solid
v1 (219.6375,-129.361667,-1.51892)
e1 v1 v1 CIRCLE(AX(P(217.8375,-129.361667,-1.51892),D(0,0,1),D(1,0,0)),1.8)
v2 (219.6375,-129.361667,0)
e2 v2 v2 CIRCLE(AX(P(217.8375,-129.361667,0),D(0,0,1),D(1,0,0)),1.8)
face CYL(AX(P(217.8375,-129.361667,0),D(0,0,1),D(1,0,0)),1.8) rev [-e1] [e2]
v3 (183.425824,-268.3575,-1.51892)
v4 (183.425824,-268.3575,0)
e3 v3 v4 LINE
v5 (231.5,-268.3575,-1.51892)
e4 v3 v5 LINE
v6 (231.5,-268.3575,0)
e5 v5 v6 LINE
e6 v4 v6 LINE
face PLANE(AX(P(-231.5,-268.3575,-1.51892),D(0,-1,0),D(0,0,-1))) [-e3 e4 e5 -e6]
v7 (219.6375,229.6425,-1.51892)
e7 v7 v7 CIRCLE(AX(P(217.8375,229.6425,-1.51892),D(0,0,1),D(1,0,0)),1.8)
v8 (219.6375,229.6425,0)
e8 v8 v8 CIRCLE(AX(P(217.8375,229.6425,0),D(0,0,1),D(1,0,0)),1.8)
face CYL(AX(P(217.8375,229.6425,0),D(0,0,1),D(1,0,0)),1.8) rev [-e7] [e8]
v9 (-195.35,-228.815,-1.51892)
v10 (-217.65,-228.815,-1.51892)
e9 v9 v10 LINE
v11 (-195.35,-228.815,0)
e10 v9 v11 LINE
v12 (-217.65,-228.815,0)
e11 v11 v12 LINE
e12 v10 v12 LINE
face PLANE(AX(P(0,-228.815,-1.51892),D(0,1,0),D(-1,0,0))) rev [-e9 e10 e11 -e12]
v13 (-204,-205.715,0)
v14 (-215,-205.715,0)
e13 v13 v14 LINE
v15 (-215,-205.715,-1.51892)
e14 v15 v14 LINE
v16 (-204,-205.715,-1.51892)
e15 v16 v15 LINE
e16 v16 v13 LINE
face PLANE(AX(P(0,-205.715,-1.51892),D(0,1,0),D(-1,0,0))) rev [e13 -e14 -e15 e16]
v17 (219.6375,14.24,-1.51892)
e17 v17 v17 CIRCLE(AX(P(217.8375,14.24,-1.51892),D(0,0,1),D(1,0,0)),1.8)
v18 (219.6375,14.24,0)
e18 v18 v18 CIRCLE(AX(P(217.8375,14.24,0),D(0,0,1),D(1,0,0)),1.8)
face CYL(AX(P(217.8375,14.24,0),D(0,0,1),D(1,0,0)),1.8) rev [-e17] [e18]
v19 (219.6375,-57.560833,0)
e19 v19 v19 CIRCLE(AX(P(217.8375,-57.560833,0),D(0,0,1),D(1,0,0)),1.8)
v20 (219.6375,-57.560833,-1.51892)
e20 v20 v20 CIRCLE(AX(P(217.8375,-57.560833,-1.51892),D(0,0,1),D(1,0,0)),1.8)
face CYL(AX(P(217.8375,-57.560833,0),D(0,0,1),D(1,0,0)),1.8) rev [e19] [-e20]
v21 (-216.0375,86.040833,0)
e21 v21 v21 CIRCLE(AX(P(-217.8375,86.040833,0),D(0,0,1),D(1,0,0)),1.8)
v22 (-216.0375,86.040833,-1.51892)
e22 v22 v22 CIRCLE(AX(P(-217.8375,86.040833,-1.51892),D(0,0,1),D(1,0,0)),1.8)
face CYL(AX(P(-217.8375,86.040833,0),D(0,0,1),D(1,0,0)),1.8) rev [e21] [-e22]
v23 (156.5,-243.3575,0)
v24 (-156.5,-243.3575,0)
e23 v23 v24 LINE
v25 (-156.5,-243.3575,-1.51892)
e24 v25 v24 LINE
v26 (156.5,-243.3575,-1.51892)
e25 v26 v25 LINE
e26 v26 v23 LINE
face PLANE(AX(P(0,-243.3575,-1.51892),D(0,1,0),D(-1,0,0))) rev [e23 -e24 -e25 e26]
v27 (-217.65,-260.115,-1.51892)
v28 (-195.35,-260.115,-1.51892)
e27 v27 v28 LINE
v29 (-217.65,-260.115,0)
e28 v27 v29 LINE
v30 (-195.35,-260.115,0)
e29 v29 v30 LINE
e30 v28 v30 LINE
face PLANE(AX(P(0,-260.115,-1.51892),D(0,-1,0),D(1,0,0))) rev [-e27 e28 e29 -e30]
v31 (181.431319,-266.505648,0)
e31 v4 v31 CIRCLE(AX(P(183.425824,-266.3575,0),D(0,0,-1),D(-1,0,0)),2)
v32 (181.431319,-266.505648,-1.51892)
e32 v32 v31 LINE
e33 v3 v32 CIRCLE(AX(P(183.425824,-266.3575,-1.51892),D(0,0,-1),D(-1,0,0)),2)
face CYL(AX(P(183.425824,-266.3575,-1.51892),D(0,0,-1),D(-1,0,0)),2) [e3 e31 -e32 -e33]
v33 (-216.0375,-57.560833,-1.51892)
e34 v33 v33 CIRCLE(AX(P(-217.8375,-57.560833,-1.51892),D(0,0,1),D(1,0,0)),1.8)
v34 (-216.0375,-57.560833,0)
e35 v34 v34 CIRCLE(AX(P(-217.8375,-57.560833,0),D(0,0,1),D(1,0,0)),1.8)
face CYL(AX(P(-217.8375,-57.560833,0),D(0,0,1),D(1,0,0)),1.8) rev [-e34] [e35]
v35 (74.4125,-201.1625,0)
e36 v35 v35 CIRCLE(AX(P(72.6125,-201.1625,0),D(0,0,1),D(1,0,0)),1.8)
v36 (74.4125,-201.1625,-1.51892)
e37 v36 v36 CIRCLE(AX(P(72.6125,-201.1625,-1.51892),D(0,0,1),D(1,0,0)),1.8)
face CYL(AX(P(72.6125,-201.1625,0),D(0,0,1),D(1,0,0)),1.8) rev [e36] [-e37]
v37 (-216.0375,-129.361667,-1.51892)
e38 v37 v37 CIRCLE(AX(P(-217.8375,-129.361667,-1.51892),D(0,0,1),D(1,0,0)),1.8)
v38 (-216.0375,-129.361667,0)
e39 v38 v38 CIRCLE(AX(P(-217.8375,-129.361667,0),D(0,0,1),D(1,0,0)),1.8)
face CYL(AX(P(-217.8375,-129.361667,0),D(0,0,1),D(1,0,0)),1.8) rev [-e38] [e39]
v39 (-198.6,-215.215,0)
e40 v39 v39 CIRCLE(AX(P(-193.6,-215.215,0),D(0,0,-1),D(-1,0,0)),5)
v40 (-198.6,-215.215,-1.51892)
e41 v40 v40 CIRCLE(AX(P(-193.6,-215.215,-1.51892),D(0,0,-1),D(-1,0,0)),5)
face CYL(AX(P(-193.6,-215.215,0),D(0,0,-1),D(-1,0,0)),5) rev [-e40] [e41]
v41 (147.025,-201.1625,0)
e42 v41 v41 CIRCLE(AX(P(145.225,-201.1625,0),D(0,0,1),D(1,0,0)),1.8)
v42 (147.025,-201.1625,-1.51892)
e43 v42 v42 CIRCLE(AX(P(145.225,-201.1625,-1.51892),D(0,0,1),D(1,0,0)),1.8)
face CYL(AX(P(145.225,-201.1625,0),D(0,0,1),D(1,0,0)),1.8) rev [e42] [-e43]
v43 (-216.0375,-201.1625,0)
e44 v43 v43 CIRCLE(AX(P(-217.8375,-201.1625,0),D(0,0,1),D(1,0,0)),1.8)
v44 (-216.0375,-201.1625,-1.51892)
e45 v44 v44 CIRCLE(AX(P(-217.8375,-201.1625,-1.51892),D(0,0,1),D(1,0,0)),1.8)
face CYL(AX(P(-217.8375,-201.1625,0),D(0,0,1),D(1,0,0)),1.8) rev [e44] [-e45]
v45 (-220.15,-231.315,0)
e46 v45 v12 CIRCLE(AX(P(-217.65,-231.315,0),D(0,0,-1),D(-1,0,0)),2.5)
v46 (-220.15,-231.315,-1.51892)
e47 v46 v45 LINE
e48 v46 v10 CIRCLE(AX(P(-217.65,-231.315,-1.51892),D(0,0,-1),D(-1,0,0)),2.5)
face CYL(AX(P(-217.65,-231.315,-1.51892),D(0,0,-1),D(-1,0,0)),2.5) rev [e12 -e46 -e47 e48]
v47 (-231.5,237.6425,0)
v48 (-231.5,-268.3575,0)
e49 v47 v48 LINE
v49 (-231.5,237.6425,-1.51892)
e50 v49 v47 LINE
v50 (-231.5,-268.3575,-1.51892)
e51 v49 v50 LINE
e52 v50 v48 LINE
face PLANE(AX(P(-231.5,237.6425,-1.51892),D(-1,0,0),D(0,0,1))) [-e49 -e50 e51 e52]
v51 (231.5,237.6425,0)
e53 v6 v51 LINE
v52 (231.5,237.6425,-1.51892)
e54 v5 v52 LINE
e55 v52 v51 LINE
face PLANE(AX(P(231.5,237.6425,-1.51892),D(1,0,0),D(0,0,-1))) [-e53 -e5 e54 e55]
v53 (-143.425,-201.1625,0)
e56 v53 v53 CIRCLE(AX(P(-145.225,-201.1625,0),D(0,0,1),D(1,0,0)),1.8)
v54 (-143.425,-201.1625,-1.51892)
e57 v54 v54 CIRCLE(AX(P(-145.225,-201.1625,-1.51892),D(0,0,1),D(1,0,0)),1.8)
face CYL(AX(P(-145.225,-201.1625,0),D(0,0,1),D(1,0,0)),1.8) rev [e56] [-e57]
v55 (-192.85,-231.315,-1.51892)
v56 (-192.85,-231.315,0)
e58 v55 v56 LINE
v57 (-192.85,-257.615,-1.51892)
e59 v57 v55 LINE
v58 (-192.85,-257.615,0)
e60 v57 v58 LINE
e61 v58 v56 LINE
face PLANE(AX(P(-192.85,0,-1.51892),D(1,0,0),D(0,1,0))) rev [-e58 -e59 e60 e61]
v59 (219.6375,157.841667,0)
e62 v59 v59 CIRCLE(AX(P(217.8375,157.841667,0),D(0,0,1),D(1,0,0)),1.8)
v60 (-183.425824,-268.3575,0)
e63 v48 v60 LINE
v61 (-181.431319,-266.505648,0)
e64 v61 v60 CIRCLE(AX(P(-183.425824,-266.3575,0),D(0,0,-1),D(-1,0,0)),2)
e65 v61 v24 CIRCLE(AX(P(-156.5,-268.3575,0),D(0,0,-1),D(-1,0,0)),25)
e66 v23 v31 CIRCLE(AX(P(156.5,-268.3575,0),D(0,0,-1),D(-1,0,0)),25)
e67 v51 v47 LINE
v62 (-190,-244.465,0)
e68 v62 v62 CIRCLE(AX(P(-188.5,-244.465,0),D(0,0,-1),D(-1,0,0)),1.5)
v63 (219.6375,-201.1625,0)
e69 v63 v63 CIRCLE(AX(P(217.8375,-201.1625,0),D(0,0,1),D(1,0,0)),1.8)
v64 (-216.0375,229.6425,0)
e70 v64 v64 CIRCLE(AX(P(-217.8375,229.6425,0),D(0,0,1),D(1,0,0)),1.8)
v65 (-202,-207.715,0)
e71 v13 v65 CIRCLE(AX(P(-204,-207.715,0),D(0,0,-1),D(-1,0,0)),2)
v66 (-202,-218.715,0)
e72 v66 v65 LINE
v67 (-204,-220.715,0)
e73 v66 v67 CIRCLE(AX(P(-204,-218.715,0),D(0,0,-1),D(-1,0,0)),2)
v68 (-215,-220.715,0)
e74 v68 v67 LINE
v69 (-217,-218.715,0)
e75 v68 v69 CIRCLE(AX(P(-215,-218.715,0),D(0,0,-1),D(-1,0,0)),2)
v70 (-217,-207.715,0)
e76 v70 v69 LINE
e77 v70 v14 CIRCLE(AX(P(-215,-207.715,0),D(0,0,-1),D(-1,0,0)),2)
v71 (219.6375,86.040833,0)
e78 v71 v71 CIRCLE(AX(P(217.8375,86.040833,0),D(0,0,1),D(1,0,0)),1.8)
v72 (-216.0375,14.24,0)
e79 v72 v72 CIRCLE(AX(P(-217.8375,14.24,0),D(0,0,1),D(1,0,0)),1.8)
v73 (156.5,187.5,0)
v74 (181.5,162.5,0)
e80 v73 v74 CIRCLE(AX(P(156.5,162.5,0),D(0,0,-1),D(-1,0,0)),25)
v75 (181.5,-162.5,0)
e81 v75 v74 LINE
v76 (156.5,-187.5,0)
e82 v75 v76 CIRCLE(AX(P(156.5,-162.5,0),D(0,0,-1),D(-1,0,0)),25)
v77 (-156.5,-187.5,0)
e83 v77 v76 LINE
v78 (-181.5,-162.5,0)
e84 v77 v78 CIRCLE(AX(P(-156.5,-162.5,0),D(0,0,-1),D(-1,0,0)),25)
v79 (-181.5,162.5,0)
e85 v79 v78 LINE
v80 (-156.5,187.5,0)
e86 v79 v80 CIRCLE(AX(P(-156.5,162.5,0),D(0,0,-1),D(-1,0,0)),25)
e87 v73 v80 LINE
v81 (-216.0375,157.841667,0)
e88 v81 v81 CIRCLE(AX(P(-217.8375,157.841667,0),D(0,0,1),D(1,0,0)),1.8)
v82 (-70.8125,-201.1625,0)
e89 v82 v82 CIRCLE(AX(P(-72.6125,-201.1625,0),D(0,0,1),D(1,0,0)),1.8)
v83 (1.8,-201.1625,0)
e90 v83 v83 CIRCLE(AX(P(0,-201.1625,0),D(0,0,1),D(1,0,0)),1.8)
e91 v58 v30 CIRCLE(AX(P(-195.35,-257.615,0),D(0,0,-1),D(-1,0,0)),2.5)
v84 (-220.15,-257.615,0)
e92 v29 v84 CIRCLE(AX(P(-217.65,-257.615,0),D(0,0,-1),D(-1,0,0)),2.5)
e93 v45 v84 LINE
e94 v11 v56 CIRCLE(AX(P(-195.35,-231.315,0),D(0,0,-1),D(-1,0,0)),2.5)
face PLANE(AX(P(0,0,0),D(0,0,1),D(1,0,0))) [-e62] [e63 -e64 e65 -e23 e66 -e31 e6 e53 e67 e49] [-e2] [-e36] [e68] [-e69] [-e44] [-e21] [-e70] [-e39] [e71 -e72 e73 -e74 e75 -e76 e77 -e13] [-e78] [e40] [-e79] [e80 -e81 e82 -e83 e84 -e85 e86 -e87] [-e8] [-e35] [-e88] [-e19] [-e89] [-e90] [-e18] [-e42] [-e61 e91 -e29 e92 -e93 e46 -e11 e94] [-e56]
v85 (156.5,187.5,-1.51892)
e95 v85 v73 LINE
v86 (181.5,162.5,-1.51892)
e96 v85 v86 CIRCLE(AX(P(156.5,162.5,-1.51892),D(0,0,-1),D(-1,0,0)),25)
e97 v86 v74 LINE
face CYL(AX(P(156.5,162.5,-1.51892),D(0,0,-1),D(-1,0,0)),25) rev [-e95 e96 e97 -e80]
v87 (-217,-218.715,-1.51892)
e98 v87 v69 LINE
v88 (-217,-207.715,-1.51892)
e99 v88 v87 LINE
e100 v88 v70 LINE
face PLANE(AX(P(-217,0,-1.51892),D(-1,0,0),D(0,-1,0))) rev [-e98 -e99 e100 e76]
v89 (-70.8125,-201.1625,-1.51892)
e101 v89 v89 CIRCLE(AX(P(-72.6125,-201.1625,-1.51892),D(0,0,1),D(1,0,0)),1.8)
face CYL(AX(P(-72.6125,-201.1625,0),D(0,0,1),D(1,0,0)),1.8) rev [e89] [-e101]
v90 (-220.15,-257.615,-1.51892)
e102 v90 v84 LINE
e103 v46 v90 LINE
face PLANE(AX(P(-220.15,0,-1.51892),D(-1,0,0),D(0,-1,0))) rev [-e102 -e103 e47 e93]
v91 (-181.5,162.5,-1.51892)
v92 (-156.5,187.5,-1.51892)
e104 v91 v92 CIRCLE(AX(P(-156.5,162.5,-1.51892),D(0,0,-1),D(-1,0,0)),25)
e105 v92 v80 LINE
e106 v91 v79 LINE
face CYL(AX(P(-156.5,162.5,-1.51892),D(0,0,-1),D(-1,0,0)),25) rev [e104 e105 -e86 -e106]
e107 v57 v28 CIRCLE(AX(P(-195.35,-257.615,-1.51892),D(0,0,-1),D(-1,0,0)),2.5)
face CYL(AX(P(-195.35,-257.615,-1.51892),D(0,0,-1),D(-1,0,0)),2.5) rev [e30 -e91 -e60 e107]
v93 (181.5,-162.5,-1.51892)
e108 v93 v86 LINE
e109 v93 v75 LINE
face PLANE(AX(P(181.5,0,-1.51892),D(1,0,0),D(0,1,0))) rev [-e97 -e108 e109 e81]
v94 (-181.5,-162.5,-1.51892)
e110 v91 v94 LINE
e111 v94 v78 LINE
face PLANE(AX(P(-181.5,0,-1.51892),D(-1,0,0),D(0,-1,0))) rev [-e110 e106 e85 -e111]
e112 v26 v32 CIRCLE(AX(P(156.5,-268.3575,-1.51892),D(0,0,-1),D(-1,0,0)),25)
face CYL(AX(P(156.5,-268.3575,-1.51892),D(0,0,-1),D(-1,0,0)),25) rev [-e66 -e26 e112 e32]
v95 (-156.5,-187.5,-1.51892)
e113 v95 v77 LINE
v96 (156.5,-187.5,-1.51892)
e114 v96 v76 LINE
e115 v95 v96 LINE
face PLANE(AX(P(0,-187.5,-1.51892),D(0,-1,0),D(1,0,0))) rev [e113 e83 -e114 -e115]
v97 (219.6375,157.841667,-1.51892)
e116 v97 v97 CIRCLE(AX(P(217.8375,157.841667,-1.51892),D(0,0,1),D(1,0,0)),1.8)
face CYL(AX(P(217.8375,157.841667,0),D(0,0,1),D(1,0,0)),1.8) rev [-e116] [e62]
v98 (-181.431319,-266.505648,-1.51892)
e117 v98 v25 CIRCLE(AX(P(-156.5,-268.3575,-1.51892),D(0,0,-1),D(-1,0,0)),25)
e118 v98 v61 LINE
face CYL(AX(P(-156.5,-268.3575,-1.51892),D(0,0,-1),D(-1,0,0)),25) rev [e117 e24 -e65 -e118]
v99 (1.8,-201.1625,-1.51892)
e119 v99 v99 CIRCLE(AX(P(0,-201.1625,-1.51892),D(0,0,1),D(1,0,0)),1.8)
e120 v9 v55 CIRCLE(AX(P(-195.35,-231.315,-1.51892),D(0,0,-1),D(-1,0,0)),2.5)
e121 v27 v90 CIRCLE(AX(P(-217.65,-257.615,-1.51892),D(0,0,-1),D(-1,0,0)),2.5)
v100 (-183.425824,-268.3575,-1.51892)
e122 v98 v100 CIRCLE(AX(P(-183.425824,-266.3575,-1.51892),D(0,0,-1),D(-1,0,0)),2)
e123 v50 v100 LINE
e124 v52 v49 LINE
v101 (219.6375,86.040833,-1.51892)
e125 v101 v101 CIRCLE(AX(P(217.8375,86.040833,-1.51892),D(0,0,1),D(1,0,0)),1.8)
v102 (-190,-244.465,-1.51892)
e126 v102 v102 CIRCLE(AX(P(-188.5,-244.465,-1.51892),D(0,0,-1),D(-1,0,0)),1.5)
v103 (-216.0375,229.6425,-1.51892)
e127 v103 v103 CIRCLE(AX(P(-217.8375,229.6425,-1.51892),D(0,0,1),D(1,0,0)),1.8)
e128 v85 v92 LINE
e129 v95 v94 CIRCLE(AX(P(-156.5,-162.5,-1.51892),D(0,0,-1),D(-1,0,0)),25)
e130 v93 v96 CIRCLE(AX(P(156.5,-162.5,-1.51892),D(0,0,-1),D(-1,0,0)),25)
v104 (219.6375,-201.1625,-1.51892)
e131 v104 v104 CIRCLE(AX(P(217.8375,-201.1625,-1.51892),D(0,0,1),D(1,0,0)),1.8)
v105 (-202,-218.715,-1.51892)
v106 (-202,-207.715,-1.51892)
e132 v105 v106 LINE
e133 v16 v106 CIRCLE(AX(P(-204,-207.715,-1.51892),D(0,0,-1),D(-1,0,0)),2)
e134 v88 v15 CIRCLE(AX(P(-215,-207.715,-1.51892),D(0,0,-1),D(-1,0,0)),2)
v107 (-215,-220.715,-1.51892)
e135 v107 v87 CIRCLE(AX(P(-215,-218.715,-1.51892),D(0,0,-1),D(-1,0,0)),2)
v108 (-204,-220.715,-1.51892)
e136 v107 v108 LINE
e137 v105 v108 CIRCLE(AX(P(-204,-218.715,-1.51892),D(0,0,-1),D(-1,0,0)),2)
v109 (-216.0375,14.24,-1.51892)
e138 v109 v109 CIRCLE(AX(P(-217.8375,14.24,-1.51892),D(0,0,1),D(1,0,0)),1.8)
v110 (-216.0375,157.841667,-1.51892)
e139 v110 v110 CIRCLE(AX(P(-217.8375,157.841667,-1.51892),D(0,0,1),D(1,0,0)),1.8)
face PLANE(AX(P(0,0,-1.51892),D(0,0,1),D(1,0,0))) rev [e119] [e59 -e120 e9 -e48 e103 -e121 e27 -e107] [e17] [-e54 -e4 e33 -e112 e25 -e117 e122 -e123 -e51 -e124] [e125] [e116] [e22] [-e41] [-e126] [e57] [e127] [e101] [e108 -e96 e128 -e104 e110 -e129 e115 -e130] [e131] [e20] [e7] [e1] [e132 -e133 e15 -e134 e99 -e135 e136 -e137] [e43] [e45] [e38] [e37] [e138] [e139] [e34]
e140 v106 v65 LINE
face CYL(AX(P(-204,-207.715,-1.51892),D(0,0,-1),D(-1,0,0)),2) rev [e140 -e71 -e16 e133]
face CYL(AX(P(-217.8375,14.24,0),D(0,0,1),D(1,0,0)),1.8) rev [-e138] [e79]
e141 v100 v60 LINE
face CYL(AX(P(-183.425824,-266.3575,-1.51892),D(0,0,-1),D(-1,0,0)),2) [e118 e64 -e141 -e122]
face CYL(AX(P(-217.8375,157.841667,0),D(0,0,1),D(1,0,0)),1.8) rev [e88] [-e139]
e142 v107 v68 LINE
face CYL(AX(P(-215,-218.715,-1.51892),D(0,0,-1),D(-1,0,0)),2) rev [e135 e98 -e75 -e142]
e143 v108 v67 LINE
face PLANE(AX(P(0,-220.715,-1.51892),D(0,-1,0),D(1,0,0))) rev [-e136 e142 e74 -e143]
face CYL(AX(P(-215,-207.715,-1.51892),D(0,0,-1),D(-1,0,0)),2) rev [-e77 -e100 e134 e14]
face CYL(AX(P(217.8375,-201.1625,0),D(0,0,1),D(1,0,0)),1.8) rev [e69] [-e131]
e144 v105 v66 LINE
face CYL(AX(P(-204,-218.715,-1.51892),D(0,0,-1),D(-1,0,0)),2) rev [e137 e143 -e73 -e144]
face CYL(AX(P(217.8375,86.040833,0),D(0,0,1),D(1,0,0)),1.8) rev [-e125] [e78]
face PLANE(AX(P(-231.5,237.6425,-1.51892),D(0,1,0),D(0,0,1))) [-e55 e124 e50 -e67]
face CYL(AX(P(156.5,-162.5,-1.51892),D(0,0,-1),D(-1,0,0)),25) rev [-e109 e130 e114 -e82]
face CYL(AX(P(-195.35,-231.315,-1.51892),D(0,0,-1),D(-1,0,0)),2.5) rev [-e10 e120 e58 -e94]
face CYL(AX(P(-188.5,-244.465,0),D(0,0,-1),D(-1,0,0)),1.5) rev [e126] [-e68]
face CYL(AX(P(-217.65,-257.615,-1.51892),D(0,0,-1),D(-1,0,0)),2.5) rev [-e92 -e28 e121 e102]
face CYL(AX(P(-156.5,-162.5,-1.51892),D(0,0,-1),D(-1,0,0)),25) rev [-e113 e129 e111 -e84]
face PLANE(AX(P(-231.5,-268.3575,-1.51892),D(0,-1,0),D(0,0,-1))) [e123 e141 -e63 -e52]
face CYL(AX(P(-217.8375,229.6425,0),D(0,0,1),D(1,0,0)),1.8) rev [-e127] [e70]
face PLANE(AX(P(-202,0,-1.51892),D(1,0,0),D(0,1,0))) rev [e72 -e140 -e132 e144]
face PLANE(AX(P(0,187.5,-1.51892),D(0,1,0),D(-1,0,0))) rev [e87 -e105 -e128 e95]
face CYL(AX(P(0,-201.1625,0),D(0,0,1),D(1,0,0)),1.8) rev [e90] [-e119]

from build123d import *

# Parameters (mm, degrees)
SKETCH2_W                = 463
SKETCH2_H                = 506
BASE_FLANGE1_DEPTH       = 1.51892
SKETCH13_R               = 1.5
SKETCH13_R_2             = 5
CUT_EXTRUDE1_DEPTH       = 1.51892
M3_CLEARANCE_HOLE2_D     = 3.6
M3_CLEARANCE_HOLE2_DEPTH = 11.938
M3_CLEARANCE_HOLE2_TIP   = 1.081549114


# Sheet-metal steps are written as plain solids
with BuildPart() as part:
    # Sketch2 → Base-Flange1 (new body)
    with BuildSketch(Plane.XY):
        with Locations((0, -15.3575)):
            Rectangle(SKETCH2_W, SKETCH2_H)
    extrude(amount=-BASE_FLANGE1_DEPTH)

    # Sketch13 → Cut-Extrude1 (cut)
    with BuildSketch(Plane(origin=(0, 0, -1.51892), x_dir=(-1, 0, 0), z_dir=(0, 0, -1))):
        with BuildLine():
            Line((156.5, 187.5), (-156.5, 187.5))
            ThreePointArc((-156.5, 187.5), (-174.17766953, 180.17766953), (-181.5, 162.5))
            Line((-181.5, 162.5), (-181.5, -162.5))
            ThreePointArc((-181.5, -162.5), (-174.17766953, -180.17766953), (-156.5, -187.5))
            Line((-156.5, -187.5), (156.5, -187.5))
            ThreePointArc((156.5, -187.5), (174.17766953, -180.17766953), (181.5, -162.5))
            Line((181.5, -162.5), (181.5, 162.5))
            ThreePointArc((181.5, 162.5), (174.17766953, 180.17766953), (156.5, 187.5))
        make_face()
        with BuildLine():
            Line((217.65, -260.115), (195.35, -260.115))
            ThreePointArc((195.35, -260.115), (193.582233047, -259.382766953), (192.85, -257.615))
            Line((192.85, -257.615), (192.85, -231.315))
            ThreePointArc((192.85, -231.315), (193.582233047, -229.547233047), (195.35, -228.815))
            Line((195.35, -228.815), (217.65, -228.815))
            ThreePointArc((217.65, -228.815), (219.417766953, -229.547233047), (220.15, -231.315))
            Line((220.15, -231.315), (220.15, -257.615))
            ThreePointArc((220.15, -257.615), (219.417766953, -259.382766953), (217.65, -260.115))
        make_face()
        with BuildLine():
            Line((156.5, -243.3575), (-156.5, -243.3575))
            ThreePointArc((-156.5, -243.3575), (-173.510345436, -250.03679728), (-181.431318552, -266.505648148))
            ThreePointArc((-181.431318552, -266.505648148), (-182.064996401, -267.823156218), (-183.425824036, -268.3575))
            Line((-183.425824036, -268.3575), (183.425824036, -268.3575))
            ThreePointArc((183.425824036, -268.3575), (182.064996401, -267.823156218), (181.431318552, -266.505648148))
            ThreePointArc((181.431318552, -266.505648148), (173.510345436, -250.03679728), (156.5, -243.3575))
        make_face()
        with Locations((188.5, -244.465)):
            Circle(SKETCH13_R)
        with BuildLine():
            Line((217, -207.715), (217, -218.715))
            ThreePointArc((217, -218.715), (216.414213562, -220.129213562), (215, -220.715))
            Line((215, -220.715), (204, -220.715))
            ThreePointArc((204, -220.715), (202.585786438, -220.129213562), (202, -218.715))
            Line((202, -218.715), (202, -207.715))
            ThreePointArc((202, -207.715), (202.585786438, -206.300786438), (204, -205.715))
            Line((204, -205.715), (215, -205.715))
            ThreePointArc((215, -205.715), (216.414213562, -206.300786438), (217, -207.715))
        make_face()
        with Locations((193.6, -215.215)):
            Circle(SKETCH13_R_2)
    extrude(amount=-CUT_EXTRUDE1_DEPTH, mode=Mode.SUBTRACT)

    # M3 Clearance Hole2
    with Locations(Plane.XY):
        with Locations((217.8375, -129.361666667), (217.8375, -57.560833333), (217.8375, 14.24), (217.8375, 86.040833333), (217.8375, 157.841666667), (-217.8375, 157.841666667), (-217.8375, 86.040833333), (-217.8375, 14.24), (-217.8375, -57.560833333), (-217.8375, -129.361666667), (-145.225, -201.1625), (-72.6125, -201.1625), (0, -201.1625), (72.6125, -201.1625), (145.225, -201.1625), (-217.8375, 229.6425), (217.8375, 229.6425), (217.8375, -201.1625), (-217.8375, -201.1625)):
            Hole(M3_CLEARANCE_HOLE2_D / 2, depth=M3_CLEARANCE_HOLE2_DEPTH)
            with Locations((0, 0, -(M3_CLEARANCE_HOLE2_DEPTH + M3_CLEARANCE_HOLE2_TIP / 2))):  # 118° drill point
                Cone(0, M3_CLEARANCE_HOLE2_D / 2, M3_CLEARANCE_HOLE2_TIP, mode=Mode.SUBTRACT)


solid = part.part
